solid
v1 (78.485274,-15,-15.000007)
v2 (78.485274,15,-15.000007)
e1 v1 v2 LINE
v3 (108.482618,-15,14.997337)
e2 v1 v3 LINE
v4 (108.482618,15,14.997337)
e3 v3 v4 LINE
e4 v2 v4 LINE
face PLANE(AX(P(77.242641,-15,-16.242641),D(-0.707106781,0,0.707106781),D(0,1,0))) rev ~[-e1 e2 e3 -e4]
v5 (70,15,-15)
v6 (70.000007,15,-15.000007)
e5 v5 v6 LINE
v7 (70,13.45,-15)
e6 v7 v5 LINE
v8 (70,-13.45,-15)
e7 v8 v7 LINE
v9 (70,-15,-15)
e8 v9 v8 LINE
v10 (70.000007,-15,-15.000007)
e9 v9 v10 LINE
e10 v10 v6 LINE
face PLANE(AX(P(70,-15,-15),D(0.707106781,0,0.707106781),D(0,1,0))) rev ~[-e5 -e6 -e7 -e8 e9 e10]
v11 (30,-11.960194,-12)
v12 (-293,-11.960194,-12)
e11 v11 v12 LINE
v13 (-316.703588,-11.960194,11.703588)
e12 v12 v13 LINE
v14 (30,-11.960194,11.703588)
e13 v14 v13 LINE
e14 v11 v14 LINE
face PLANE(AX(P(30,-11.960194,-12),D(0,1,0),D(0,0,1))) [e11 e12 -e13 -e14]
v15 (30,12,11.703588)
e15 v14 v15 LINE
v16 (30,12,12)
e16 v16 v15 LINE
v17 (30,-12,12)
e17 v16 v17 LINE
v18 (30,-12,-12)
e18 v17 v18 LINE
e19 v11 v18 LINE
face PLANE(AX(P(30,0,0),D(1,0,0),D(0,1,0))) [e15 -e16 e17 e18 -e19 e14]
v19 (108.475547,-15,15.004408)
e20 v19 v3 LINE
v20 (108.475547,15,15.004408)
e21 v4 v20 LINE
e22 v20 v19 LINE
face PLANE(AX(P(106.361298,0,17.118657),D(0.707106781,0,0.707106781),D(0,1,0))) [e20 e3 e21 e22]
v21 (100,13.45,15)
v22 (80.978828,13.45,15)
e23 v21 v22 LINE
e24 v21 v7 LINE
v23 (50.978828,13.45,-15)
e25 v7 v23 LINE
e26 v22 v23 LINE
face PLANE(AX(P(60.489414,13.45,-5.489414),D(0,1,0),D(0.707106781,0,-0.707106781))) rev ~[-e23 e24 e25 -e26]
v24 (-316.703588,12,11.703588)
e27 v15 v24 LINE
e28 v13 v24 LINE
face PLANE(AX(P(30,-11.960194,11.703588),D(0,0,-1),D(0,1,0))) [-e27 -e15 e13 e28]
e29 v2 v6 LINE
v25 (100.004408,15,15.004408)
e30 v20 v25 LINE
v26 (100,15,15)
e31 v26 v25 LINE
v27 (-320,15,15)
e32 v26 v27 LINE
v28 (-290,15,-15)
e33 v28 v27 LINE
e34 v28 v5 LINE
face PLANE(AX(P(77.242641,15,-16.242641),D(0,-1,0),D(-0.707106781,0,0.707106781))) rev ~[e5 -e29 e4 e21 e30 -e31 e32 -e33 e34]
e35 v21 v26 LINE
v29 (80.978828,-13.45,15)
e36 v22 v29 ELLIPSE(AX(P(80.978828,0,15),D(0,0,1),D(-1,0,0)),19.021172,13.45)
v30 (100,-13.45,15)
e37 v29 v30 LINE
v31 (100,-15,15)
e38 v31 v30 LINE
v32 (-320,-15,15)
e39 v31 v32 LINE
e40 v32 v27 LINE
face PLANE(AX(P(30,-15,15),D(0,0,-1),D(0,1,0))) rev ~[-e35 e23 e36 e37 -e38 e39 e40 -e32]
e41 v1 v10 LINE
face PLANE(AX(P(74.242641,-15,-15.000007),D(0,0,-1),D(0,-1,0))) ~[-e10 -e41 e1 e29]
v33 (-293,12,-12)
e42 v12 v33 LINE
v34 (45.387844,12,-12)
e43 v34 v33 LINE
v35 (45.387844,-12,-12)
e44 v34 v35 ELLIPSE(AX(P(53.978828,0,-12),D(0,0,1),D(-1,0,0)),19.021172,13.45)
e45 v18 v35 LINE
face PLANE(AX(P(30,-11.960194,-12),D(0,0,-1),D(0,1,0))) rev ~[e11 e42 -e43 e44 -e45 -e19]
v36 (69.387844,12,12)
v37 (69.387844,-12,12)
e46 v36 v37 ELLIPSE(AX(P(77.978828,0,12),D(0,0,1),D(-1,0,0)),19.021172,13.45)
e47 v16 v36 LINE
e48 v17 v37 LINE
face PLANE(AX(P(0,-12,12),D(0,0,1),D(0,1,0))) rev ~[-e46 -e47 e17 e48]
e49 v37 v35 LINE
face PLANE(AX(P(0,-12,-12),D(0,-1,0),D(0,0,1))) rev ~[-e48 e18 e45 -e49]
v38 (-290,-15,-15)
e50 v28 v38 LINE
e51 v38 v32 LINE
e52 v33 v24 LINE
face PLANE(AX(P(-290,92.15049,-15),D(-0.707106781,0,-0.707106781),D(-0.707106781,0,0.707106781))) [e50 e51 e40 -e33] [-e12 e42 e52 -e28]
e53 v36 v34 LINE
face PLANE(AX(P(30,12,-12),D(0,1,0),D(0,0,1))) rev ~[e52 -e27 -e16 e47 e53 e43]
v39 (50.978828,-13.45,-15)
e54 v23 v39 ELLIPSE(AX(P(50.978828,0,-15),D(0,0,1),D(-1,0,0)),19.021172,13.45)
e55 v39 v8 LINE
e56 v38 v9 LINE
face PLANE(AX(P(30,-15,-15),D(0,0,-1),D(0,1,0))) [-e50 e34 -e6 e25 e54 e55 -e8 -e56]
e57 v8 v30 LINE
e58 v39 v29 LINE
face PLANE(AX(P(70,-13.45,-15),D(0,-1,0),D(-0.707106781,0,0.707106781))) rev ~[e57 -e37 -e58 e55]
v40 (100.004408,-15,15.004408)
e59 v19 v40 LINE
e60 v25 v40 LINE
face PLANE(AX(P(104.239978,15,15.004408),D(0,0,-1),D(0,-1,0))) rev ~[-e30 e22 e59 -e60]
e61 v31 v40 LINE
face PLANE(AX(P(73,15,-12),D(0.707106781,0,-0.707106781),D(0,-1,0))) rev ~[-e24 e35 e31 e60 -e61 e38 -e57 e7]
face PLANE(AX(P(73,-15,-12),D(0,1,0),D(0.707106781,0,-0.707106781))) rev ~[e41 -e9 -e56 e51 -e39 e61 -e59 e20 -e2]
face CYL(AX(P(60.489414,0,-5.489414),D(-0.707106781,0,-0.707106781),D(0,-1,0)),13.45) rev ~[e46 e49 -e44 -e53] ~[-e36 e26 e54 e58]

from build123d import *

# Parameters (mm, degrees)
F0_W         = 30
F0_H         = 30
F0_W_2       = 24
F0_H_2       = 24
F1_DEPTH     = 100
F3_DEPTH     = 30
F5_DEPTH     = 30
F7_DEPTH     = 6
F9_DEPTH     = 50
F13_W        = 30
F13_H        = 30
F14_DEPTH    = 30
F12_W        = 30
F12_H        = 30
F12_W_2      = 23.9601944461
F12_H_2      = 23.7035881728
F15_DEPTH    = 350
F16_T1_DEPTH = 184.300979278
F18_DEPTH    = 44.18
F19_SIZE     = 5.99
F20_SIZE     = 5.99999


# Not quite as in the source:
# - a fillet or chamfer that OpenCascade refuses, or shapes differently, is made with other operations: its cross-section is extruded or revolved along the edge and cut away or added
# - a fillet or chamfer is up to 0.001 mm smaller than in the source, because OpenCascade refuses the exact size


with BuildPart() as f1:
    # F0 (on Right) → F1 (new body)
    with BuildSketch(Plane.YZ):
        Rectangle(F0_W, F0_H)
        Rectangle(F0_W_2, F0_H_2, mode=Mode.SUBTRACT)
    extrude(amount=F1_DEPTH)

    # F2 (on face) → F3 (cut)
    with BuildSketch(Plane(origin=(0, 15, 0), x_dir=(-1, 0, 0), z_dir=(0, 1, 0))):
        Polygon((0, 15), (-30, -15), (0, -15), align=None)
    extrude(amount=-F3_DEPTH, mode=Mode.SUBTRACT)

    # F4 (on face) → F5 (cut)
    with BuildSketch(Plane.XZ.offset(15)):
        Polygon((70, -15), (100, -15), (100, 15), align=None)
    extrude(amount=-F5_DEPTH, mode=Mode.SUBTRACT)

    # F6 (on face) → F7 (join)
    with BuildSketch(Plane(origin=(42.5, 0, -42.5), x_dir=(0, 1, 0), z_dir=(0.7071067812, 0, -0.7071067812))):
        Polygon((-15, 38.8908729653), (15, 38.8908729653), (15, 43.1335136524), (12, 43.1335136524), (-12, 43.1335136524), (-15, 43.1335136524), align=None)
    extrude(amount=F7_DEPTH)

    # F8 (on face) → F9 (cut, symmetric)
    with BuildSketch(Plane(origin=(27.5, 0, 27.5), x_dir=(0, -1, 0), z_dir=(-0.7071067812, 0, -0.7071067812))):
        with BuildLine():
            ThreePointArc((9.63e-08, -60.1040764009), (9.510586241, -56.1646625738), (13.45, -46.6540764009))
            ThreePointArc((13.45, -46.6540764009), (0, -33.2040764009), (-13.45, -46.6540764009))
            ThreePointArc((-13.45, -46.6540764009), (-9.5105861729, -56.1646626419), (9.63e-08, -60.1040764009))
        make_face()
        with BuildLine():
            Line((13.45, -60.1040764009), (13.45, -46.6540764009))
            ThreePointArc((13.45, -46.6540764009), (9.510586241, -56.1646625738), (9.63e-08, -60.1040764009))
            Line((9.63e-08, -60.1040764009), (13.45, -60.1040764009))
        make_face()
        with BuildLine():
            ThreePointArc((9.63e-08, -60.1040764009), (-9.5105861729, -56.1646626419), (-13.45, -46.6540764009))
            Line((-13.45, -46.6540764009), (-13.45, -60.1040764009))
            Line((-13.45, -60.1040764009), (9.63e-08, -60.1040764009))
        make_face()
    extrude(amount=F9_DEPTH, both=True, mode=Mode.SUBTRACT)

    # F13 (on face) → F14 (cut)
    with BuildSketch(Plane(origin=(0, 15, 0), x_dir=(-1, 0, 0), z_dir=(0, 1, 0))):
        with Locations((-15, 0)):
            Rectangle(F13_W, F13_H)
    extrude(amount=-F14_DEPTH, mode=Mode.SUBTRACT)

    # F12 (on face) → F15 (join)
    with BuildSketch(Plane.YZ.offset(30)):
        Rectangle(F12_W, F12_H)
        with Locations((0.0199027769, -0.1482059136)):
            Rectangle(F12_W_2, F12_H_2, mode=Mode.SUBTRACT)
    extrude(amount=-F15_DEPTH)

    # F16: chamfer of 30 on 1 edges, made by hand

    # F16_s2 → F16_t1 (cut)
    with BuildSketch(Plane.XZ.offset(-92.150489639)):
        Polygon((-290, -15), (-320, 15), (-320, -15), align=None)
    extrude(amount=F16_T1_DEPTH, mode=Mode.SUBTRACT)

    # F17 (on face) → F18 (join)
    with BuildSketch(Plane(origin=(30.5, 0, 30.5), x_dir=(0, 1, 0), z_dir=(0.7071067812, 0, 0.7071067812))):
        Polygon((-13.45, -60.1040764009), (-15, -60.1040764009), (-15, -66.1040764009), (15, -66.1040764009), (15, -60.1040764009), (13.45, -60.1040764009), align=None)
    extrude(amount=F18_DEPTH)

    # F19
    f19_edges = [f1.edges().sort_by_distance(p)[0] for p in [
        (104.239978, 0, 19.239978),
    ]]
    chamfer(f19_edges, length=F19_SIZE)

    # F20 (size 6 in the source; OpenCascade refuses exactly that, so slightly less here)
    f20_edges = [f1.edges().sort_by_distance(p)[0] for p in [
        (74.242641, 0, -19.242641),
    ]]
    chamfer(f20_edges, length=F20_SIZE)


solid = f1.part
